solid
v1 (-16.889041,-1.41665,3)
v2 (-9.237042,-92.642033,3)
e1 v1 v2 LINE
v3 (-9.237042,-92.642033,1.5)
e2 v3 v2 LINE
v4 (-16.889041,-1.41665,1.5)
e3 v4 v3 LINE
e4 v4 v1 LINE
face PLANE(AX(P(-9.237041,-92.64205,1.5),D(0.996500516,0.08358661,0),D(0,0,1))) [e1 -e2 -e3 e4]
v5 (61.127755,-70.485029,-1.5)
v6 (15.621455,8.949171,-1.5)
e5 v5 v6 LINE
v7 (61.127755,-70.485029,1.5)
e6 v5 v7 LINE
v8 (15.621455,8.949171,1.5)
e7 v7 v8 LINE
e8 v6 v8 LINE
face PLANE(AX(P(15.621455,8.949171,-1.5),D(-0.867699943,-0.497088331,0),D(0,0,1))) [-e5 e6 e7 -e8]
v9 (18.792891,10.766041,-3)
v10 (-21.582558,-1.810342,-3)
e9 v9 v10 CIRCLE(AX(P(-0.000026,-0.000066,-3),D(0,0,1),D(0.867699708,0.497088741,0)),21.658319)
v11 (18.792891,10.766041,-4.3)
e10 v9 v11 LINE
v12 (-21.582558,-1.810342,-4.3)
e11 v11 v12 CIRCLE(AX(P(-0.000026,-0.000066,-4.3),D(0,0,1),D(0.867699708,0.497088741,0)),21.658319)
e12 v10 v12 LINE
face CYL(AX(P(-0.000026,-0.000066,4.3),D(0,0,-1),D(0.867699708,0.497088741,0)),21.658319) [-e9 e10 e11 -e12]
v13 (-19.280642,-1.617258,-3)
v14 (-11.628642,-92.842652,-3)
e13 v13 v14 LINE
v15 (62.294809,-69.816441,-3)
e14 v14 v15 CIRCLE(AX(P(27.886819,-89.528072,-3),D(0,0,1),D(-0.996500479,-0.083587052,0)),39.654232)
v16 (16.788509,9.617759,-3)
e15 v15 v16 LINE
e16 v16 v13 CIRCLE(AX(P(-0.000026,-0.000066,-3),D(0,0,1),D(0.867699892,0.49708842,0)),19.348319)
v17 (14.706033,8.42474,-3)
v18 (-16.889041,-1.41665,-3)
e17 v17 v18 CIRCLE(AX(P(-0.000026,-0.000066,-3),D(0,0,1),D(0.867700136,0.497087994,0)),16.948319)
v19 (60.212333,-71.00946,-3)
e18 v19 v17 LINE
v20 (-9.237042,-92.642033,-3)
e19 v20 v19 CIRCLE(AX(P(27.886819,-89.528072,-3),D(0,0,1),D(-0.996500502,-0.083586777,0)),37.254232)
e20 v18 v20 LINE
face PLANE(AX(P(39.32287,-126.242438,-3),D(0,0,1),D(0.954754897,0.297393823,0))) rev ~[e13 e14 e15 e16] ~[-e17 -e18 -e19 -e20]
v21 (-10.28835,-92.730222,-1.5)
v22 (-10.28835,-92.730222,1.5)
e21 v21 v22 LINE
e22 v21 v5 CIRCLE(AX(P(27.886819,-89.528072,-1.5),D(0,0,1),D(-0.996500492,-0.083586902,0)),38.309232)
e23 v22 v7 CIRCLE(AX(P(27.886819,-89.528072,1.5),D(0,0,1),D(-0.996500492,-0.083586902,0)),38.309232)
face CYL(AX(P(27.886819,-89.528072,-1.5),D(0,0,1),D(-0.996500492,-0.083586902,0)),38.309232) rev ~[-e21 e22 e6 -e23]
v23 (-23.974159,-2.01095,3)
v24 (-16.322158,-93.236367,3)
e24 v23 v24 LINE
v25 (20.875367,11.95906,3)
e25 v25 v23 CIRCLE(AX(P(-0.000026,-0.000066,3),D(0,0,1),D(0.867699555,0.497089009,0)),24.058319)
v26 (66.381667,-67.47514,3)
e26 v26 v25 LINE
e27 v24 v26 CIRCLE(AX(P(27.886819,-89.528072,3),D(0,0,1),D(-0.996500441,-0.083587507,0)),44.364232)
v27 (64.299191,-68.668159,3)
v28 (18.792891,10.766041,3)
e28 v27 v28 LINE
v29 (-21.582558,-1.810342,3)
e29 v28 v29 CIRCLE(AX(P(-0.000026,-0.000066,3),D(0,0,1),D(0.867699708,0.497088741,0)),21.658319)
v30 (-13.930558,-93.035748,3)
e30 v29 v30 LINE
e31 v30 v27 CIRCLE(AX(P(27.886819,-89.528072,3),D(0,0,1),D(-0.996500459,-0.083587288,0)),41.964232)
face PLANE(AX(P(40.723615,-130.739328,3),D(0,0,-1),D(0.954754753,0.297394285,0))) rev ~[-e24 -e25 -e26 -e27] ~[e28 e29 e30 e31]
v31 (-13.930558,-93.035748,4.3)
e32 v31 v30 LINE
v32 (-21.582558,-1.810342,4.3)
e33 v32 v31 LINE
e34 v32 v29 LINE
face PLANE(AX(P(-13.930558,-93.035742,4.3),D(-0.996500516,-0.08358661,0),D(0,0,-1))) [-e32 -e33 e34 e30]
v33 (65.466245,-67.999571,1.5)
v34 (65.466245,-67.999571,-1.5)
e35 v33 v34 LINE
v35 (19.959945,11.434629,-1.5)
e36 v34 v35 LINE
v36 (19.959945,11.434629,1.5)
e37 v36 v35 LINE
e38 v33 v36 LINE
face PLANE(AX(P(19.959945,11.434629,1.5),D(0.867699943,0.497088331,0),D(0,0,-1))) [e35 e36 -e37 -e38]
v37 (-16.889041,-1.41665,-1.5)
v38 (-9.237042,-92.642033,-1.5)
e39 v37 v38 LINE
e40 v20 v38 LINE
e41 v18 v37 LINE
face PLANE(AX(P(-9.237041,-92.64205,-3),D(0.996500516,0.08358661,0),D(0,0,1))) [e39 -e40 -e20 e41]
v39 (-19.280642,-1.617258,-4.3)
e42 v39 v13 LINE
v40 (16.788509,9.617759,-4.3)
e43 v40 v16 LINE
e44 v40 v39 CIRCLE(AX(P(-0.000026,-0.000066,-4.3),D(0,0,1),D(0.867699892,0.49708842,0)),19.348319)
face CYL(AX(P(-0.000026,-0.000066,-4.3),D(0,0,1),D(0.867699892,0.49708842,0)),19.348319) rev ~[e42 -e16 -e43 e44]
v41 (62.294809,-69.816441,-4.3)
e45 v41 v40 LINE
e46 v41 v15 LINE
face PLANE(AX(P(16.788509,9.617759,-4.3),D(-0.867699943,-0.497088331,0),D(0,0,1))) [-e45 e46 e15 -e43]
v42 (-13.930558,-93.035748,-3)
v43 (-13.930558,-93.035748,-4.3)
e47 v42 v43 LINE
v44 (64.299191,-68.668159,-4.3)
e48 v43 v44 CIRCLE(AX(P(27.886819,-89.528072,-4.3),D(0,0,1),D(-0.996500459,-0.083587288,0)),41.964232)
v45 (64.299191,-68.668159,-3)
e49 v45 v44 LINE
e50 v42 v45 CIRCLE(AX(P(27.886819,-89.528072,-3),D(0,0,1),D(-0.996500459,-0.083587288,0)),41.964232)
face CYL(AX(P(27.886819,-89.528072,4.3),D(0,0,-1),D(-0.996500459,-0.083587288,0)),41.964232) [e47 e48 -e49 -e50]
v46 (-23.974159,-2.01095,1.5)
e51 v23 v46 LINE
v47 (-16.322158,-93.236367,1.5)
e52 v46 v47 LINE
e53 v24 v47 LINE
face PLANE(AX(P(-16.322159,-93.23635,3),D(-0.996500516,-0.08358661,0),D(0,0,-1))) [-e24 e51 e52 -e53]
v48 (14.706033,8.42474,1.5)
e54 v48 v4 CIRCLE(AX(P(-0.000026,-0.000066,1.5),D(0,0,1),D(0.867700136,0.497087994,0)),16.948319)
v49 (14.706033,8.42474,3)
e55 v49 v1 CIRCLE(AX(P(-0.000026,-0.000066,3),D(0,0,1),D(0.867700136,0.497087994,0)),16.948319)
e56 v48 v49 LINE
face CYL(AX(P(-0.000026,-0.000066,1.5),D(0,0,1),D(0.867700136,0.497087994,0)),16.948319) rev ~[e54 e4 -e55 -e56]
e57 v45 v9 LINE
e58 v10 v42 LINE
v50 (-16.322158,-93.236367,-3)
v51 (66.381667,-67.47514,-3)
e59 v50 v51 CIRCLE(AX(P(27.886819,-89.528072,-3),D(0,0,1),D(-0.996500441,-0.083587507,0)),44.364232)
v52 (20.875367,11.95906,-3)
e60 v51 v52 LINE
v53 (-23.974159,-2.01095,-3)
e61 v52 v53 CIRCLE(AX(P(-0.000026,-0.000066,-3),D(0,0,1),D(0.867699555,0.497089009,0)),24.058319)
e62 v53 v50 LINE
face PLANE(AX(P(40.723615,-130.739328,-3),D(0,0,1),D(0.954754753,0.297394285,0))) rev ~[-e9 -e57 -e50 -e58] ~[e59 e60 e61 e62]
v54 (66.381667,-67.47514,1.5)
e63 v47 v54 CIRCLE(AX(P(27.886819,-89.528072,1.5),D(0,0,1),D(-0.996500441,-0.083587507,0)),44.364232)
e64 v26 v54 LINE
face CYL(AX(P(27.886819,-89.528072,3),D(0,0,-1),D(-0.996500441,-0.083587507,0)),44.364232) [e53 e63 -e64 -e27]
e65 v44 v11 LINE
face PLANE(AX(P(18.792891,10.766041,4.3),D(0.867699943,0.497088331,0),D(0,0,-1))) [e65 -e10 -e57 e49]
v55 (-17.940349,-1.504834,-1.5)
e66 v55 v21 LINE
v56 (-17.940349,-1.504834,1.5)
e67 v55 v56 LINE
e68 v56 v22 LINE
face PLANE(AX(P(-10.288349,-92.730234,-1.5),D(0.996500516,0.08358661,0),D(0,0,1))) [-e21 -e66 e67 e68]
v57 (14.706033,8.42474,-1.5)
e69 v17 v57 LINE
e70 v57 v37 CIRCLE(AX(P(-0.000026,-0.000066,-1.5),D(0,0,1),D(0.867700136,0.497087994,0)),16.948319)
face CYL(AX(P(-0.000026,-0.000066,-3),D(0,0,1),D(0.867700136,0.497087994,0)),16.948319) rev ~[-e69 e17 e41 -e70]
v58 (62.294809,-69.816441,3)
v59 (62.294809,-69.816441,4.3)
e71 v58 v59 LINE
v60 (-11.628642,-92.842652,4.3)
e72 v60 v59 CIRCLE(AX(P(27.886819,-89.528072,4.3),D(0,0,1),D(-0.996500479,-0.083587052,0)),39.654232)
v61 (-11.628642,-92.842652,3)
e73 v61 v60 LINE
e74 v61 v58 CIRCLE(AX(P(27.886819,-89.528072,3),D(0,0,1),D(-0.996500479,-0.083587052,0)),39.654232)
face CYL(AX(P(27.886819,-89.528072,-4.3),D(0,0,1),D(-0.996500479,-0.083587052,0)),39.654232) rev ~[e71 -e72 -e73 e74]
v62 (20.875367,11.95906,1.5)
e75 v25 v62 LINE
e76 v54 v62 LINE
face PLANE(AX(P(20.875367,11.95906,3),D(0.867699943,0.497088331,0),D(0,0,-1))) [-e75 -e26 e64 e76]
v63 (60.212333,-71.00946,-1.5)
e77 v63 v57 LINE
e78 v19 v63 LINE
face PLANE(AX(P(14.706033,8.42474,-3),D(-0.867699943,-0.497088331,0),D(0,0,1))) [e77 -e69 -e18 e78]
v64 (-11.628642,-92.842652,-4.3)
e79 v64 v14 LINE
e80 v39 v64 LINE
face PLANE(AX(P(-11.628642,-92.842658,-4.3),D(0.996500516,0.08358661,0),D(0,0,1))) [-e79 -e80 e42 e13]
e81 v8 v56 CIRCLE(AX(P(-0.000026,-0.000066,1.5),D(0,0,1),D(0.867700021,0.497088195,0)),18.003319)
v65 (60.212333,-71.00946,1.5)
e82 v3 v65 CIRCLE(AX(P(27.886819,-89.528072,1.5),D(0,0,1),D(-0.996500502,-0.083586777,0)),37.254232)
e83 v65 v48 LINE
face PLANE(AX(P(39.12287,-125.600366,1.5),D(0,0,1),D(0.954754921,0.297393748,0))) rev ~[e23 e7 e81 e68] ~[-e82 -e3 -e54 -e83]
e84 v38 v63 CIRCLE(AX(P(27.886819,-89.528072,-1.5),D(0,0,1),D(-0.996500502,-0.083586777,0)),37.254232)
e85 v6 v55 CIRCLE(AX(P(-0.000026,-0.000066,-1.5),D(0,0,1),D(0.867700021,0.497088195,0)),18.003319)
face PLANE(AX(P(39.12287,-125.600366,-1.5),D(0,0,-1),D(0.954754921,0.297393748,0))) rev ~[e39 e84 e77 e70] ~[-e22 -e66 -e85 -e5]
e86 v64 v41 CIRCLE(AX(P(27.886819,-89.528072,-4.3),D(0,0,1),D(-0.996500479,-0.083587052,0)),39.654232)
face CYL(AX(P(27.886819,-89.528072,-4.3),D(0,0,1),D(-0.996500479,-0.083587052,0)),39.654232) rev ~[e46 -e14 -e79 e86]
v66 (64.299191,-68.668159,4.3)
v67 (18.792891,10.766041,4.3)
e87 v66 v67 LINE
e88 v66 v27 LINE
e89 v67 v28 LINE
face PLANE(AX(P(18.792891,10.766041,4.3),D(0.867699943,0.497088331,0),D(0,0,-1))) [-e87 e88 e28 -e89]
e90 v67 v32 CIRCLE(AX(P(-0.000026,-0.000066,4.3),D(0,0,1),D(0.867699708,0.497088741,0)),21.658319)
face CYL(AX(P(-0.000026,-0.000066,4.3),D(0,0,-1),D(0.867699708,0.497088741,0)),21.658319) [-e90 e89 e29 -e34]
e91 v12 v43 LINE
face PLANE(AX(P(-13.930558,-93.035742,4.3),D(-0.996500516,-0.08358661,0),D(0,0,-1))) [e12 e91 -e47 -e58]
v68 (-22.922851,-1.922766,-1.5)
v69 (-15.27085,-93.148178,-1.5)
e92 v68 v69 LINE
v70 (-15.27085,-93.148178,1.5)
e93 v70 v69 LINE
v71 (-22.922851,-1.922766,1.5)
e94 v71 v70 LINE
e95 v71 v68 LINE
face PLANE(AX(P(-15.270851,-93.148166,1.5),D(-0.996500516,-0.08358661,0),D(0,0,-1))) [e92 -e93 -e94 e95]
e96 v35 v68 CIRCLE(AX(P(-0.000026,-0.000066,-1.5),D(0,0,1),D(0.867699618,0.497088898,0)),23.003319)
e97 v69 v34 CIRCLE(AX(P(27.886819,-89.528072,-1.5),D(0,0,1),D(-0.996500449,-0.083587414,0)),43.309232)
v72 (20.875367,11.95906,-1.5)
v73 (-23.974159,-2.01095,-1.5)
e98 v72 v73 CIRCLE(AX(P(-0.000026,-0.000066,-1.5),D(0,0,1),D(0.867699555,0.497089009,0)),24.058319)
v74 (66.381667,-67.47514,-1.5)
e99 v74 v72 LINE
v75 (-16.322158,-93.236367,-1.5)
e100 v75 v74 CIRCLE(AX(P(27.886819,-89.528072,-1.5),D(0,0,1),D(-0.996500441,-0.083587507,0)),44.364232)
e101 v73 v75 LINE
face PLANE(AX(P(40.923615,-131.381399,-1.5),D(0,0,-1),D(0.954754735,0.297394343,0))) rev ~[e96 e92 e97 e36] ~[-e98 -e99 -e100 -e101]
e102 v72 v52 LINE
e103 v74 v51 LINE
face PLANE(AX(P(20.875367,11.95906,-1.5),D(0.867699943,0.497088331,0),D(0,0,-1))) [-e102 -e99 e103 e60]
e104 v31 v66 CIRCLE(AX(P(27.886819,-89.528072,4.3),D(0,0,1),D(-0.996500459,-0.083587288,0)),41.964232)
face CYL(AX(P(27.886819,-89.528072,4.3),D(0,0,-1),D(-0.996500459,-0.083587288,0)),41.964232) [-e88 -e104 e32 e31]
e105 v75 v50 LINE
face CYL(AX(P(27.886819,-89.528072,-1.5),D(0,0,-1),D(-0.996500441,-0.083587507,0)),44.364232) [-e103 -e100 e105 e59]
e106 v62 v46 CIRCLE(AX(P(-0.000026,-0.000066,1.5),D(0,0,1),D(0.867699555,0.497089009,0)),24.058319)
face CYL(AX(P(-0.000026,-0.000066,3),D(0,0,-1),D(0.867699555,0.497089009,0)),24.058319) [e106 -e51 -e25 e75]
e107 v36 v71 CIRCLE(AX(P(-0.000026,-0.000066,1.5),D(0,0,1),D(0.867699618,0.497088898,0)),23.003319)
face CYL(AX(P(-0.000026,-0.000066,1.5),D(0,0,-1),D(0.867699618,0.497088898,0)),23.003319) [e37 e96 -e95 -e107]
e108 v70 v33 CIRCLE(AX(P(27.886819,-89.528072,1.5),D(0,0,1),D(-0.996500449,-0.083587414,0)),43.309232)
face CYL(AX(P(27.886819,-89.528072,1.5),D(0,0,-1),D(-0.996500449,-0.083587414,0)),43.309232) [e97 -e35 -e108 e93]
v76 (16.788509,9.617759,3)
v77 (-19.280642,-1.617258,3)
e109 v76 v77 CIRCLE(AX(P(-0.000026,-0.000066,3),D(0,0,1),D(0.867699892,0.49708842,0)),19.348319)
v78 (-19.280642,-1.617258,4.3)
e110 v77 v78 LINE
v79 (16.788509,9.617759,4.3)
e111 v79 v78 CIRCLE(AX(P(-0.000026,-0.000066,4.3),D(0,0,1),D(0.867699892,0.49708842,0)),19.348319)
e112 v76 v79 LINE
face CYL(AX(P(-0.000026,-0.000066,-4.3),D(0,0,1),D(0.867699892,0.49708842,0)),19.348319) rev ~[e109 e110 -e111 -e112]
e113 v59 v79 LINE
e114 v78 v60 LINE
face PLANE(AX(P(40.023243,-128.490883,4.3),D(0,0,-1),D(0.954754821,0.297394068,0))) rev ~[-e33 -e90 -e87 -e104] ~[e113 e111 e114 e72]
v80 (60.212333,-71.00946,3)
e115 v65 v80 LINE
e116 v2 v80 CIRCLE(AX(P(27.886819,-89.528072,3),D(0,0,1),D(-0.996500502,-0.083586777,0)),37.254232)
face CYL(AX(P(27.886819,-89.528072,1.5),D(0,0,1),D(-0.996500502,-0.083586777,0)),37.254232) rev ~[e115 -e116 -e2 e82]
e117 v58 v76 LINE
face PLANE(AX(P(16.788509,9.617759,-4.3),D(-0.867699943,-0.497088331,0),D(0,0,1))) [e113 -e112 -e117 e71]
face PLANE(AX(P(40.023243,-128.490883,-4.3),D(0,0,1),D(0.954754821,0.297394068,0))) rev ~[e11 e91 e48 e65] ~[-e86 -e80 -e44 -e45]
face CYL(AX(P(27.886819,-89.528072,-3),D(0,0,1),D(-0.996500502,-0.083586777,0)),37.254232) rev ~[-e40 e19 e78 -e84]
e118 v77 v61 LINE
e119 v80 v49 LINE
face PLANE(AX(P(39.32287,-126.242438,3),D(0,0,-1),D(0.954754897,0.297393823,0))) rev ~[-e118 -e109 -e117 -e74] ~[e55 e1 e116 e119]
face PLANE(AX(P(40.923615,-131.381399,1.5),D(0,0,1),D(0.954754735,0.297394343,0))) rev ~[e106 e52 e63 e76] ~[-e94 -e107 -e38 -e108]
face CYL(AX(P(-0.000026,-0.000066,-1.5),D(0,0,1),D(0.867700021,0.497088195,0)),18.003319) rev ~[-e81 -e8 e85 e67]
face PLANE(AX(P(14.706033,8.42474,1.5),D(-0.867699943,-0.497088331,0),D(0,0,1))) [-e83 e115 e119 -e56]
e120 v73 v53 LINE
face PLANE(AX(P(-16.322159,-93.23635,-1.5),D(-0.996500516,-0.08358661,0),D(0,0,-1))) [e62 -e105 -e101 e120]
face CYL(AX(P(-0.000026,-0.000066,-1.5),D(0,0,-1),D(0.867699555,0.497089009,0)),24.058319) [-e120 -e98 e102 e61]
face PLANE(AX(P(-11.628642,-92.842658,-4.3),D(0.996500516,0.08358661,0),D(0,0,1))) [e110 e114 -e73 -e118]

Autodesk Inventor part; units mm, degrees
ref_plane "Work Plane2" through (0, 0, 0) normal (-1, 0, 0) x (0, 0, 1)
ref_plane "Work Plane3" through (27.8868, -89.5281, 0) normal (-0.3402819, 0.9403235, 0) x (0, 0, 1)
sketch "Path" plane through (0, 0, 0) normal (0, 0, 1) x (1, 0, 0)
  arc A0 (17.7907, 10.1919) -> (-20.4316, -1.7138) centre (0, 0) ccw
  arc A1 (-12.7796, -92.9392) -> (63.297, -69.2423) centre (27.8868, -89.5281) ccw
  line L0 (-12.7796, -92.9392) -> (-20.4316, -1.7138)
  line L1 (17.7907, 10.1919) -> (63.297, -69.2423)
  dimension "d31" = 7.11
ref_plane "Section Plane" through (-20.4316, -1.7138, 0) normal (0.0835865, -0.9965005, 0) x (0, 0, 1)
sketch "Section Sketch" plane through (-20.4316, -1.7138, 0) normal (0.0835865, -0.9965005, 0) x (0, 0, 1)
  line L0 (-4.3, -1.155) -> (4.3, -1.155)
  line L1 (4.3, -1.155) -> (4.3, 1.155)
  line L2 (4.3, 1.155) -> (-4.3, 1.155)
  line L3 (-4.3, 1.155) -> (-4.3, -1.155)
  line L4 (-1.5, -2.5) -> (1.5, -2.5)
  line L5 (1.5, -2.5) -> (1.5, 2.5)
  line L6 (1.5, 2.5) -> (-1.5, 2.5)
  line L7 (-1.5, 2.5) -> (-1.5, -2.5)
  line L8 (-1.5, 0) -> (1.5, 0) construction
  line L9 (-3, -3.555) -> (-1.5, -3.555)
  line L10 (-1.5, -3.555) -> (-1.5, 3.555)
  line L11 (-1.5, 3.555) -> (-3, 3.555)
  line L12 (-3, 3.555) -> (-3, -3.555)
  line L13 (1.5, -3.555) -> (3, -3.555)
  line L14 (3, -3.555) -> (3, 3.555)
  line L15 (3, 3.555) -> (1.5, 3.555)
  line L16 (1.5, 3.555) -> (1.5, -3.555)
  line L17 (-4.3, 0) -> (4.3, 0) construction
  point P0 (0, 0)
  point P1 (0, 0)
  dimension "d21" = 2.31
  dimension "d22" = 5
  dimension "d23" = 3
  dimension "d24" = 1.5
  dimension "d31" = 7.11
  dimension "d32" = 8.6
sweep "Solid" add profiles "Section Sketch" path "Path"
pattern_of_one "Strand Pattern"
equation "\"d21\" = da_d2"
equation "\"d22\" = da_d1"
equation "\"d23\" = da_b1"
equation "\"d24\" = da_t1 + da_t2"
equation "\"d30\" = da_pt"
equation "\"da_p\" = 8"
equation "\"da_b1\" = 3"
equation "\"da_h2\" = 7.11"
equation "\"da_h3\" = 7.11"
equation "\"da_d1\" = 5"
equation "\"da_d2\" = 2.31"
equation "\"da_pt\" = 5.64"
equation "\"da_b\" = 8.6"
equation "\"da_t1\" = 0.75"
equation "\"da_t2\" = 0.75"
properties part number "Roller Chain"
